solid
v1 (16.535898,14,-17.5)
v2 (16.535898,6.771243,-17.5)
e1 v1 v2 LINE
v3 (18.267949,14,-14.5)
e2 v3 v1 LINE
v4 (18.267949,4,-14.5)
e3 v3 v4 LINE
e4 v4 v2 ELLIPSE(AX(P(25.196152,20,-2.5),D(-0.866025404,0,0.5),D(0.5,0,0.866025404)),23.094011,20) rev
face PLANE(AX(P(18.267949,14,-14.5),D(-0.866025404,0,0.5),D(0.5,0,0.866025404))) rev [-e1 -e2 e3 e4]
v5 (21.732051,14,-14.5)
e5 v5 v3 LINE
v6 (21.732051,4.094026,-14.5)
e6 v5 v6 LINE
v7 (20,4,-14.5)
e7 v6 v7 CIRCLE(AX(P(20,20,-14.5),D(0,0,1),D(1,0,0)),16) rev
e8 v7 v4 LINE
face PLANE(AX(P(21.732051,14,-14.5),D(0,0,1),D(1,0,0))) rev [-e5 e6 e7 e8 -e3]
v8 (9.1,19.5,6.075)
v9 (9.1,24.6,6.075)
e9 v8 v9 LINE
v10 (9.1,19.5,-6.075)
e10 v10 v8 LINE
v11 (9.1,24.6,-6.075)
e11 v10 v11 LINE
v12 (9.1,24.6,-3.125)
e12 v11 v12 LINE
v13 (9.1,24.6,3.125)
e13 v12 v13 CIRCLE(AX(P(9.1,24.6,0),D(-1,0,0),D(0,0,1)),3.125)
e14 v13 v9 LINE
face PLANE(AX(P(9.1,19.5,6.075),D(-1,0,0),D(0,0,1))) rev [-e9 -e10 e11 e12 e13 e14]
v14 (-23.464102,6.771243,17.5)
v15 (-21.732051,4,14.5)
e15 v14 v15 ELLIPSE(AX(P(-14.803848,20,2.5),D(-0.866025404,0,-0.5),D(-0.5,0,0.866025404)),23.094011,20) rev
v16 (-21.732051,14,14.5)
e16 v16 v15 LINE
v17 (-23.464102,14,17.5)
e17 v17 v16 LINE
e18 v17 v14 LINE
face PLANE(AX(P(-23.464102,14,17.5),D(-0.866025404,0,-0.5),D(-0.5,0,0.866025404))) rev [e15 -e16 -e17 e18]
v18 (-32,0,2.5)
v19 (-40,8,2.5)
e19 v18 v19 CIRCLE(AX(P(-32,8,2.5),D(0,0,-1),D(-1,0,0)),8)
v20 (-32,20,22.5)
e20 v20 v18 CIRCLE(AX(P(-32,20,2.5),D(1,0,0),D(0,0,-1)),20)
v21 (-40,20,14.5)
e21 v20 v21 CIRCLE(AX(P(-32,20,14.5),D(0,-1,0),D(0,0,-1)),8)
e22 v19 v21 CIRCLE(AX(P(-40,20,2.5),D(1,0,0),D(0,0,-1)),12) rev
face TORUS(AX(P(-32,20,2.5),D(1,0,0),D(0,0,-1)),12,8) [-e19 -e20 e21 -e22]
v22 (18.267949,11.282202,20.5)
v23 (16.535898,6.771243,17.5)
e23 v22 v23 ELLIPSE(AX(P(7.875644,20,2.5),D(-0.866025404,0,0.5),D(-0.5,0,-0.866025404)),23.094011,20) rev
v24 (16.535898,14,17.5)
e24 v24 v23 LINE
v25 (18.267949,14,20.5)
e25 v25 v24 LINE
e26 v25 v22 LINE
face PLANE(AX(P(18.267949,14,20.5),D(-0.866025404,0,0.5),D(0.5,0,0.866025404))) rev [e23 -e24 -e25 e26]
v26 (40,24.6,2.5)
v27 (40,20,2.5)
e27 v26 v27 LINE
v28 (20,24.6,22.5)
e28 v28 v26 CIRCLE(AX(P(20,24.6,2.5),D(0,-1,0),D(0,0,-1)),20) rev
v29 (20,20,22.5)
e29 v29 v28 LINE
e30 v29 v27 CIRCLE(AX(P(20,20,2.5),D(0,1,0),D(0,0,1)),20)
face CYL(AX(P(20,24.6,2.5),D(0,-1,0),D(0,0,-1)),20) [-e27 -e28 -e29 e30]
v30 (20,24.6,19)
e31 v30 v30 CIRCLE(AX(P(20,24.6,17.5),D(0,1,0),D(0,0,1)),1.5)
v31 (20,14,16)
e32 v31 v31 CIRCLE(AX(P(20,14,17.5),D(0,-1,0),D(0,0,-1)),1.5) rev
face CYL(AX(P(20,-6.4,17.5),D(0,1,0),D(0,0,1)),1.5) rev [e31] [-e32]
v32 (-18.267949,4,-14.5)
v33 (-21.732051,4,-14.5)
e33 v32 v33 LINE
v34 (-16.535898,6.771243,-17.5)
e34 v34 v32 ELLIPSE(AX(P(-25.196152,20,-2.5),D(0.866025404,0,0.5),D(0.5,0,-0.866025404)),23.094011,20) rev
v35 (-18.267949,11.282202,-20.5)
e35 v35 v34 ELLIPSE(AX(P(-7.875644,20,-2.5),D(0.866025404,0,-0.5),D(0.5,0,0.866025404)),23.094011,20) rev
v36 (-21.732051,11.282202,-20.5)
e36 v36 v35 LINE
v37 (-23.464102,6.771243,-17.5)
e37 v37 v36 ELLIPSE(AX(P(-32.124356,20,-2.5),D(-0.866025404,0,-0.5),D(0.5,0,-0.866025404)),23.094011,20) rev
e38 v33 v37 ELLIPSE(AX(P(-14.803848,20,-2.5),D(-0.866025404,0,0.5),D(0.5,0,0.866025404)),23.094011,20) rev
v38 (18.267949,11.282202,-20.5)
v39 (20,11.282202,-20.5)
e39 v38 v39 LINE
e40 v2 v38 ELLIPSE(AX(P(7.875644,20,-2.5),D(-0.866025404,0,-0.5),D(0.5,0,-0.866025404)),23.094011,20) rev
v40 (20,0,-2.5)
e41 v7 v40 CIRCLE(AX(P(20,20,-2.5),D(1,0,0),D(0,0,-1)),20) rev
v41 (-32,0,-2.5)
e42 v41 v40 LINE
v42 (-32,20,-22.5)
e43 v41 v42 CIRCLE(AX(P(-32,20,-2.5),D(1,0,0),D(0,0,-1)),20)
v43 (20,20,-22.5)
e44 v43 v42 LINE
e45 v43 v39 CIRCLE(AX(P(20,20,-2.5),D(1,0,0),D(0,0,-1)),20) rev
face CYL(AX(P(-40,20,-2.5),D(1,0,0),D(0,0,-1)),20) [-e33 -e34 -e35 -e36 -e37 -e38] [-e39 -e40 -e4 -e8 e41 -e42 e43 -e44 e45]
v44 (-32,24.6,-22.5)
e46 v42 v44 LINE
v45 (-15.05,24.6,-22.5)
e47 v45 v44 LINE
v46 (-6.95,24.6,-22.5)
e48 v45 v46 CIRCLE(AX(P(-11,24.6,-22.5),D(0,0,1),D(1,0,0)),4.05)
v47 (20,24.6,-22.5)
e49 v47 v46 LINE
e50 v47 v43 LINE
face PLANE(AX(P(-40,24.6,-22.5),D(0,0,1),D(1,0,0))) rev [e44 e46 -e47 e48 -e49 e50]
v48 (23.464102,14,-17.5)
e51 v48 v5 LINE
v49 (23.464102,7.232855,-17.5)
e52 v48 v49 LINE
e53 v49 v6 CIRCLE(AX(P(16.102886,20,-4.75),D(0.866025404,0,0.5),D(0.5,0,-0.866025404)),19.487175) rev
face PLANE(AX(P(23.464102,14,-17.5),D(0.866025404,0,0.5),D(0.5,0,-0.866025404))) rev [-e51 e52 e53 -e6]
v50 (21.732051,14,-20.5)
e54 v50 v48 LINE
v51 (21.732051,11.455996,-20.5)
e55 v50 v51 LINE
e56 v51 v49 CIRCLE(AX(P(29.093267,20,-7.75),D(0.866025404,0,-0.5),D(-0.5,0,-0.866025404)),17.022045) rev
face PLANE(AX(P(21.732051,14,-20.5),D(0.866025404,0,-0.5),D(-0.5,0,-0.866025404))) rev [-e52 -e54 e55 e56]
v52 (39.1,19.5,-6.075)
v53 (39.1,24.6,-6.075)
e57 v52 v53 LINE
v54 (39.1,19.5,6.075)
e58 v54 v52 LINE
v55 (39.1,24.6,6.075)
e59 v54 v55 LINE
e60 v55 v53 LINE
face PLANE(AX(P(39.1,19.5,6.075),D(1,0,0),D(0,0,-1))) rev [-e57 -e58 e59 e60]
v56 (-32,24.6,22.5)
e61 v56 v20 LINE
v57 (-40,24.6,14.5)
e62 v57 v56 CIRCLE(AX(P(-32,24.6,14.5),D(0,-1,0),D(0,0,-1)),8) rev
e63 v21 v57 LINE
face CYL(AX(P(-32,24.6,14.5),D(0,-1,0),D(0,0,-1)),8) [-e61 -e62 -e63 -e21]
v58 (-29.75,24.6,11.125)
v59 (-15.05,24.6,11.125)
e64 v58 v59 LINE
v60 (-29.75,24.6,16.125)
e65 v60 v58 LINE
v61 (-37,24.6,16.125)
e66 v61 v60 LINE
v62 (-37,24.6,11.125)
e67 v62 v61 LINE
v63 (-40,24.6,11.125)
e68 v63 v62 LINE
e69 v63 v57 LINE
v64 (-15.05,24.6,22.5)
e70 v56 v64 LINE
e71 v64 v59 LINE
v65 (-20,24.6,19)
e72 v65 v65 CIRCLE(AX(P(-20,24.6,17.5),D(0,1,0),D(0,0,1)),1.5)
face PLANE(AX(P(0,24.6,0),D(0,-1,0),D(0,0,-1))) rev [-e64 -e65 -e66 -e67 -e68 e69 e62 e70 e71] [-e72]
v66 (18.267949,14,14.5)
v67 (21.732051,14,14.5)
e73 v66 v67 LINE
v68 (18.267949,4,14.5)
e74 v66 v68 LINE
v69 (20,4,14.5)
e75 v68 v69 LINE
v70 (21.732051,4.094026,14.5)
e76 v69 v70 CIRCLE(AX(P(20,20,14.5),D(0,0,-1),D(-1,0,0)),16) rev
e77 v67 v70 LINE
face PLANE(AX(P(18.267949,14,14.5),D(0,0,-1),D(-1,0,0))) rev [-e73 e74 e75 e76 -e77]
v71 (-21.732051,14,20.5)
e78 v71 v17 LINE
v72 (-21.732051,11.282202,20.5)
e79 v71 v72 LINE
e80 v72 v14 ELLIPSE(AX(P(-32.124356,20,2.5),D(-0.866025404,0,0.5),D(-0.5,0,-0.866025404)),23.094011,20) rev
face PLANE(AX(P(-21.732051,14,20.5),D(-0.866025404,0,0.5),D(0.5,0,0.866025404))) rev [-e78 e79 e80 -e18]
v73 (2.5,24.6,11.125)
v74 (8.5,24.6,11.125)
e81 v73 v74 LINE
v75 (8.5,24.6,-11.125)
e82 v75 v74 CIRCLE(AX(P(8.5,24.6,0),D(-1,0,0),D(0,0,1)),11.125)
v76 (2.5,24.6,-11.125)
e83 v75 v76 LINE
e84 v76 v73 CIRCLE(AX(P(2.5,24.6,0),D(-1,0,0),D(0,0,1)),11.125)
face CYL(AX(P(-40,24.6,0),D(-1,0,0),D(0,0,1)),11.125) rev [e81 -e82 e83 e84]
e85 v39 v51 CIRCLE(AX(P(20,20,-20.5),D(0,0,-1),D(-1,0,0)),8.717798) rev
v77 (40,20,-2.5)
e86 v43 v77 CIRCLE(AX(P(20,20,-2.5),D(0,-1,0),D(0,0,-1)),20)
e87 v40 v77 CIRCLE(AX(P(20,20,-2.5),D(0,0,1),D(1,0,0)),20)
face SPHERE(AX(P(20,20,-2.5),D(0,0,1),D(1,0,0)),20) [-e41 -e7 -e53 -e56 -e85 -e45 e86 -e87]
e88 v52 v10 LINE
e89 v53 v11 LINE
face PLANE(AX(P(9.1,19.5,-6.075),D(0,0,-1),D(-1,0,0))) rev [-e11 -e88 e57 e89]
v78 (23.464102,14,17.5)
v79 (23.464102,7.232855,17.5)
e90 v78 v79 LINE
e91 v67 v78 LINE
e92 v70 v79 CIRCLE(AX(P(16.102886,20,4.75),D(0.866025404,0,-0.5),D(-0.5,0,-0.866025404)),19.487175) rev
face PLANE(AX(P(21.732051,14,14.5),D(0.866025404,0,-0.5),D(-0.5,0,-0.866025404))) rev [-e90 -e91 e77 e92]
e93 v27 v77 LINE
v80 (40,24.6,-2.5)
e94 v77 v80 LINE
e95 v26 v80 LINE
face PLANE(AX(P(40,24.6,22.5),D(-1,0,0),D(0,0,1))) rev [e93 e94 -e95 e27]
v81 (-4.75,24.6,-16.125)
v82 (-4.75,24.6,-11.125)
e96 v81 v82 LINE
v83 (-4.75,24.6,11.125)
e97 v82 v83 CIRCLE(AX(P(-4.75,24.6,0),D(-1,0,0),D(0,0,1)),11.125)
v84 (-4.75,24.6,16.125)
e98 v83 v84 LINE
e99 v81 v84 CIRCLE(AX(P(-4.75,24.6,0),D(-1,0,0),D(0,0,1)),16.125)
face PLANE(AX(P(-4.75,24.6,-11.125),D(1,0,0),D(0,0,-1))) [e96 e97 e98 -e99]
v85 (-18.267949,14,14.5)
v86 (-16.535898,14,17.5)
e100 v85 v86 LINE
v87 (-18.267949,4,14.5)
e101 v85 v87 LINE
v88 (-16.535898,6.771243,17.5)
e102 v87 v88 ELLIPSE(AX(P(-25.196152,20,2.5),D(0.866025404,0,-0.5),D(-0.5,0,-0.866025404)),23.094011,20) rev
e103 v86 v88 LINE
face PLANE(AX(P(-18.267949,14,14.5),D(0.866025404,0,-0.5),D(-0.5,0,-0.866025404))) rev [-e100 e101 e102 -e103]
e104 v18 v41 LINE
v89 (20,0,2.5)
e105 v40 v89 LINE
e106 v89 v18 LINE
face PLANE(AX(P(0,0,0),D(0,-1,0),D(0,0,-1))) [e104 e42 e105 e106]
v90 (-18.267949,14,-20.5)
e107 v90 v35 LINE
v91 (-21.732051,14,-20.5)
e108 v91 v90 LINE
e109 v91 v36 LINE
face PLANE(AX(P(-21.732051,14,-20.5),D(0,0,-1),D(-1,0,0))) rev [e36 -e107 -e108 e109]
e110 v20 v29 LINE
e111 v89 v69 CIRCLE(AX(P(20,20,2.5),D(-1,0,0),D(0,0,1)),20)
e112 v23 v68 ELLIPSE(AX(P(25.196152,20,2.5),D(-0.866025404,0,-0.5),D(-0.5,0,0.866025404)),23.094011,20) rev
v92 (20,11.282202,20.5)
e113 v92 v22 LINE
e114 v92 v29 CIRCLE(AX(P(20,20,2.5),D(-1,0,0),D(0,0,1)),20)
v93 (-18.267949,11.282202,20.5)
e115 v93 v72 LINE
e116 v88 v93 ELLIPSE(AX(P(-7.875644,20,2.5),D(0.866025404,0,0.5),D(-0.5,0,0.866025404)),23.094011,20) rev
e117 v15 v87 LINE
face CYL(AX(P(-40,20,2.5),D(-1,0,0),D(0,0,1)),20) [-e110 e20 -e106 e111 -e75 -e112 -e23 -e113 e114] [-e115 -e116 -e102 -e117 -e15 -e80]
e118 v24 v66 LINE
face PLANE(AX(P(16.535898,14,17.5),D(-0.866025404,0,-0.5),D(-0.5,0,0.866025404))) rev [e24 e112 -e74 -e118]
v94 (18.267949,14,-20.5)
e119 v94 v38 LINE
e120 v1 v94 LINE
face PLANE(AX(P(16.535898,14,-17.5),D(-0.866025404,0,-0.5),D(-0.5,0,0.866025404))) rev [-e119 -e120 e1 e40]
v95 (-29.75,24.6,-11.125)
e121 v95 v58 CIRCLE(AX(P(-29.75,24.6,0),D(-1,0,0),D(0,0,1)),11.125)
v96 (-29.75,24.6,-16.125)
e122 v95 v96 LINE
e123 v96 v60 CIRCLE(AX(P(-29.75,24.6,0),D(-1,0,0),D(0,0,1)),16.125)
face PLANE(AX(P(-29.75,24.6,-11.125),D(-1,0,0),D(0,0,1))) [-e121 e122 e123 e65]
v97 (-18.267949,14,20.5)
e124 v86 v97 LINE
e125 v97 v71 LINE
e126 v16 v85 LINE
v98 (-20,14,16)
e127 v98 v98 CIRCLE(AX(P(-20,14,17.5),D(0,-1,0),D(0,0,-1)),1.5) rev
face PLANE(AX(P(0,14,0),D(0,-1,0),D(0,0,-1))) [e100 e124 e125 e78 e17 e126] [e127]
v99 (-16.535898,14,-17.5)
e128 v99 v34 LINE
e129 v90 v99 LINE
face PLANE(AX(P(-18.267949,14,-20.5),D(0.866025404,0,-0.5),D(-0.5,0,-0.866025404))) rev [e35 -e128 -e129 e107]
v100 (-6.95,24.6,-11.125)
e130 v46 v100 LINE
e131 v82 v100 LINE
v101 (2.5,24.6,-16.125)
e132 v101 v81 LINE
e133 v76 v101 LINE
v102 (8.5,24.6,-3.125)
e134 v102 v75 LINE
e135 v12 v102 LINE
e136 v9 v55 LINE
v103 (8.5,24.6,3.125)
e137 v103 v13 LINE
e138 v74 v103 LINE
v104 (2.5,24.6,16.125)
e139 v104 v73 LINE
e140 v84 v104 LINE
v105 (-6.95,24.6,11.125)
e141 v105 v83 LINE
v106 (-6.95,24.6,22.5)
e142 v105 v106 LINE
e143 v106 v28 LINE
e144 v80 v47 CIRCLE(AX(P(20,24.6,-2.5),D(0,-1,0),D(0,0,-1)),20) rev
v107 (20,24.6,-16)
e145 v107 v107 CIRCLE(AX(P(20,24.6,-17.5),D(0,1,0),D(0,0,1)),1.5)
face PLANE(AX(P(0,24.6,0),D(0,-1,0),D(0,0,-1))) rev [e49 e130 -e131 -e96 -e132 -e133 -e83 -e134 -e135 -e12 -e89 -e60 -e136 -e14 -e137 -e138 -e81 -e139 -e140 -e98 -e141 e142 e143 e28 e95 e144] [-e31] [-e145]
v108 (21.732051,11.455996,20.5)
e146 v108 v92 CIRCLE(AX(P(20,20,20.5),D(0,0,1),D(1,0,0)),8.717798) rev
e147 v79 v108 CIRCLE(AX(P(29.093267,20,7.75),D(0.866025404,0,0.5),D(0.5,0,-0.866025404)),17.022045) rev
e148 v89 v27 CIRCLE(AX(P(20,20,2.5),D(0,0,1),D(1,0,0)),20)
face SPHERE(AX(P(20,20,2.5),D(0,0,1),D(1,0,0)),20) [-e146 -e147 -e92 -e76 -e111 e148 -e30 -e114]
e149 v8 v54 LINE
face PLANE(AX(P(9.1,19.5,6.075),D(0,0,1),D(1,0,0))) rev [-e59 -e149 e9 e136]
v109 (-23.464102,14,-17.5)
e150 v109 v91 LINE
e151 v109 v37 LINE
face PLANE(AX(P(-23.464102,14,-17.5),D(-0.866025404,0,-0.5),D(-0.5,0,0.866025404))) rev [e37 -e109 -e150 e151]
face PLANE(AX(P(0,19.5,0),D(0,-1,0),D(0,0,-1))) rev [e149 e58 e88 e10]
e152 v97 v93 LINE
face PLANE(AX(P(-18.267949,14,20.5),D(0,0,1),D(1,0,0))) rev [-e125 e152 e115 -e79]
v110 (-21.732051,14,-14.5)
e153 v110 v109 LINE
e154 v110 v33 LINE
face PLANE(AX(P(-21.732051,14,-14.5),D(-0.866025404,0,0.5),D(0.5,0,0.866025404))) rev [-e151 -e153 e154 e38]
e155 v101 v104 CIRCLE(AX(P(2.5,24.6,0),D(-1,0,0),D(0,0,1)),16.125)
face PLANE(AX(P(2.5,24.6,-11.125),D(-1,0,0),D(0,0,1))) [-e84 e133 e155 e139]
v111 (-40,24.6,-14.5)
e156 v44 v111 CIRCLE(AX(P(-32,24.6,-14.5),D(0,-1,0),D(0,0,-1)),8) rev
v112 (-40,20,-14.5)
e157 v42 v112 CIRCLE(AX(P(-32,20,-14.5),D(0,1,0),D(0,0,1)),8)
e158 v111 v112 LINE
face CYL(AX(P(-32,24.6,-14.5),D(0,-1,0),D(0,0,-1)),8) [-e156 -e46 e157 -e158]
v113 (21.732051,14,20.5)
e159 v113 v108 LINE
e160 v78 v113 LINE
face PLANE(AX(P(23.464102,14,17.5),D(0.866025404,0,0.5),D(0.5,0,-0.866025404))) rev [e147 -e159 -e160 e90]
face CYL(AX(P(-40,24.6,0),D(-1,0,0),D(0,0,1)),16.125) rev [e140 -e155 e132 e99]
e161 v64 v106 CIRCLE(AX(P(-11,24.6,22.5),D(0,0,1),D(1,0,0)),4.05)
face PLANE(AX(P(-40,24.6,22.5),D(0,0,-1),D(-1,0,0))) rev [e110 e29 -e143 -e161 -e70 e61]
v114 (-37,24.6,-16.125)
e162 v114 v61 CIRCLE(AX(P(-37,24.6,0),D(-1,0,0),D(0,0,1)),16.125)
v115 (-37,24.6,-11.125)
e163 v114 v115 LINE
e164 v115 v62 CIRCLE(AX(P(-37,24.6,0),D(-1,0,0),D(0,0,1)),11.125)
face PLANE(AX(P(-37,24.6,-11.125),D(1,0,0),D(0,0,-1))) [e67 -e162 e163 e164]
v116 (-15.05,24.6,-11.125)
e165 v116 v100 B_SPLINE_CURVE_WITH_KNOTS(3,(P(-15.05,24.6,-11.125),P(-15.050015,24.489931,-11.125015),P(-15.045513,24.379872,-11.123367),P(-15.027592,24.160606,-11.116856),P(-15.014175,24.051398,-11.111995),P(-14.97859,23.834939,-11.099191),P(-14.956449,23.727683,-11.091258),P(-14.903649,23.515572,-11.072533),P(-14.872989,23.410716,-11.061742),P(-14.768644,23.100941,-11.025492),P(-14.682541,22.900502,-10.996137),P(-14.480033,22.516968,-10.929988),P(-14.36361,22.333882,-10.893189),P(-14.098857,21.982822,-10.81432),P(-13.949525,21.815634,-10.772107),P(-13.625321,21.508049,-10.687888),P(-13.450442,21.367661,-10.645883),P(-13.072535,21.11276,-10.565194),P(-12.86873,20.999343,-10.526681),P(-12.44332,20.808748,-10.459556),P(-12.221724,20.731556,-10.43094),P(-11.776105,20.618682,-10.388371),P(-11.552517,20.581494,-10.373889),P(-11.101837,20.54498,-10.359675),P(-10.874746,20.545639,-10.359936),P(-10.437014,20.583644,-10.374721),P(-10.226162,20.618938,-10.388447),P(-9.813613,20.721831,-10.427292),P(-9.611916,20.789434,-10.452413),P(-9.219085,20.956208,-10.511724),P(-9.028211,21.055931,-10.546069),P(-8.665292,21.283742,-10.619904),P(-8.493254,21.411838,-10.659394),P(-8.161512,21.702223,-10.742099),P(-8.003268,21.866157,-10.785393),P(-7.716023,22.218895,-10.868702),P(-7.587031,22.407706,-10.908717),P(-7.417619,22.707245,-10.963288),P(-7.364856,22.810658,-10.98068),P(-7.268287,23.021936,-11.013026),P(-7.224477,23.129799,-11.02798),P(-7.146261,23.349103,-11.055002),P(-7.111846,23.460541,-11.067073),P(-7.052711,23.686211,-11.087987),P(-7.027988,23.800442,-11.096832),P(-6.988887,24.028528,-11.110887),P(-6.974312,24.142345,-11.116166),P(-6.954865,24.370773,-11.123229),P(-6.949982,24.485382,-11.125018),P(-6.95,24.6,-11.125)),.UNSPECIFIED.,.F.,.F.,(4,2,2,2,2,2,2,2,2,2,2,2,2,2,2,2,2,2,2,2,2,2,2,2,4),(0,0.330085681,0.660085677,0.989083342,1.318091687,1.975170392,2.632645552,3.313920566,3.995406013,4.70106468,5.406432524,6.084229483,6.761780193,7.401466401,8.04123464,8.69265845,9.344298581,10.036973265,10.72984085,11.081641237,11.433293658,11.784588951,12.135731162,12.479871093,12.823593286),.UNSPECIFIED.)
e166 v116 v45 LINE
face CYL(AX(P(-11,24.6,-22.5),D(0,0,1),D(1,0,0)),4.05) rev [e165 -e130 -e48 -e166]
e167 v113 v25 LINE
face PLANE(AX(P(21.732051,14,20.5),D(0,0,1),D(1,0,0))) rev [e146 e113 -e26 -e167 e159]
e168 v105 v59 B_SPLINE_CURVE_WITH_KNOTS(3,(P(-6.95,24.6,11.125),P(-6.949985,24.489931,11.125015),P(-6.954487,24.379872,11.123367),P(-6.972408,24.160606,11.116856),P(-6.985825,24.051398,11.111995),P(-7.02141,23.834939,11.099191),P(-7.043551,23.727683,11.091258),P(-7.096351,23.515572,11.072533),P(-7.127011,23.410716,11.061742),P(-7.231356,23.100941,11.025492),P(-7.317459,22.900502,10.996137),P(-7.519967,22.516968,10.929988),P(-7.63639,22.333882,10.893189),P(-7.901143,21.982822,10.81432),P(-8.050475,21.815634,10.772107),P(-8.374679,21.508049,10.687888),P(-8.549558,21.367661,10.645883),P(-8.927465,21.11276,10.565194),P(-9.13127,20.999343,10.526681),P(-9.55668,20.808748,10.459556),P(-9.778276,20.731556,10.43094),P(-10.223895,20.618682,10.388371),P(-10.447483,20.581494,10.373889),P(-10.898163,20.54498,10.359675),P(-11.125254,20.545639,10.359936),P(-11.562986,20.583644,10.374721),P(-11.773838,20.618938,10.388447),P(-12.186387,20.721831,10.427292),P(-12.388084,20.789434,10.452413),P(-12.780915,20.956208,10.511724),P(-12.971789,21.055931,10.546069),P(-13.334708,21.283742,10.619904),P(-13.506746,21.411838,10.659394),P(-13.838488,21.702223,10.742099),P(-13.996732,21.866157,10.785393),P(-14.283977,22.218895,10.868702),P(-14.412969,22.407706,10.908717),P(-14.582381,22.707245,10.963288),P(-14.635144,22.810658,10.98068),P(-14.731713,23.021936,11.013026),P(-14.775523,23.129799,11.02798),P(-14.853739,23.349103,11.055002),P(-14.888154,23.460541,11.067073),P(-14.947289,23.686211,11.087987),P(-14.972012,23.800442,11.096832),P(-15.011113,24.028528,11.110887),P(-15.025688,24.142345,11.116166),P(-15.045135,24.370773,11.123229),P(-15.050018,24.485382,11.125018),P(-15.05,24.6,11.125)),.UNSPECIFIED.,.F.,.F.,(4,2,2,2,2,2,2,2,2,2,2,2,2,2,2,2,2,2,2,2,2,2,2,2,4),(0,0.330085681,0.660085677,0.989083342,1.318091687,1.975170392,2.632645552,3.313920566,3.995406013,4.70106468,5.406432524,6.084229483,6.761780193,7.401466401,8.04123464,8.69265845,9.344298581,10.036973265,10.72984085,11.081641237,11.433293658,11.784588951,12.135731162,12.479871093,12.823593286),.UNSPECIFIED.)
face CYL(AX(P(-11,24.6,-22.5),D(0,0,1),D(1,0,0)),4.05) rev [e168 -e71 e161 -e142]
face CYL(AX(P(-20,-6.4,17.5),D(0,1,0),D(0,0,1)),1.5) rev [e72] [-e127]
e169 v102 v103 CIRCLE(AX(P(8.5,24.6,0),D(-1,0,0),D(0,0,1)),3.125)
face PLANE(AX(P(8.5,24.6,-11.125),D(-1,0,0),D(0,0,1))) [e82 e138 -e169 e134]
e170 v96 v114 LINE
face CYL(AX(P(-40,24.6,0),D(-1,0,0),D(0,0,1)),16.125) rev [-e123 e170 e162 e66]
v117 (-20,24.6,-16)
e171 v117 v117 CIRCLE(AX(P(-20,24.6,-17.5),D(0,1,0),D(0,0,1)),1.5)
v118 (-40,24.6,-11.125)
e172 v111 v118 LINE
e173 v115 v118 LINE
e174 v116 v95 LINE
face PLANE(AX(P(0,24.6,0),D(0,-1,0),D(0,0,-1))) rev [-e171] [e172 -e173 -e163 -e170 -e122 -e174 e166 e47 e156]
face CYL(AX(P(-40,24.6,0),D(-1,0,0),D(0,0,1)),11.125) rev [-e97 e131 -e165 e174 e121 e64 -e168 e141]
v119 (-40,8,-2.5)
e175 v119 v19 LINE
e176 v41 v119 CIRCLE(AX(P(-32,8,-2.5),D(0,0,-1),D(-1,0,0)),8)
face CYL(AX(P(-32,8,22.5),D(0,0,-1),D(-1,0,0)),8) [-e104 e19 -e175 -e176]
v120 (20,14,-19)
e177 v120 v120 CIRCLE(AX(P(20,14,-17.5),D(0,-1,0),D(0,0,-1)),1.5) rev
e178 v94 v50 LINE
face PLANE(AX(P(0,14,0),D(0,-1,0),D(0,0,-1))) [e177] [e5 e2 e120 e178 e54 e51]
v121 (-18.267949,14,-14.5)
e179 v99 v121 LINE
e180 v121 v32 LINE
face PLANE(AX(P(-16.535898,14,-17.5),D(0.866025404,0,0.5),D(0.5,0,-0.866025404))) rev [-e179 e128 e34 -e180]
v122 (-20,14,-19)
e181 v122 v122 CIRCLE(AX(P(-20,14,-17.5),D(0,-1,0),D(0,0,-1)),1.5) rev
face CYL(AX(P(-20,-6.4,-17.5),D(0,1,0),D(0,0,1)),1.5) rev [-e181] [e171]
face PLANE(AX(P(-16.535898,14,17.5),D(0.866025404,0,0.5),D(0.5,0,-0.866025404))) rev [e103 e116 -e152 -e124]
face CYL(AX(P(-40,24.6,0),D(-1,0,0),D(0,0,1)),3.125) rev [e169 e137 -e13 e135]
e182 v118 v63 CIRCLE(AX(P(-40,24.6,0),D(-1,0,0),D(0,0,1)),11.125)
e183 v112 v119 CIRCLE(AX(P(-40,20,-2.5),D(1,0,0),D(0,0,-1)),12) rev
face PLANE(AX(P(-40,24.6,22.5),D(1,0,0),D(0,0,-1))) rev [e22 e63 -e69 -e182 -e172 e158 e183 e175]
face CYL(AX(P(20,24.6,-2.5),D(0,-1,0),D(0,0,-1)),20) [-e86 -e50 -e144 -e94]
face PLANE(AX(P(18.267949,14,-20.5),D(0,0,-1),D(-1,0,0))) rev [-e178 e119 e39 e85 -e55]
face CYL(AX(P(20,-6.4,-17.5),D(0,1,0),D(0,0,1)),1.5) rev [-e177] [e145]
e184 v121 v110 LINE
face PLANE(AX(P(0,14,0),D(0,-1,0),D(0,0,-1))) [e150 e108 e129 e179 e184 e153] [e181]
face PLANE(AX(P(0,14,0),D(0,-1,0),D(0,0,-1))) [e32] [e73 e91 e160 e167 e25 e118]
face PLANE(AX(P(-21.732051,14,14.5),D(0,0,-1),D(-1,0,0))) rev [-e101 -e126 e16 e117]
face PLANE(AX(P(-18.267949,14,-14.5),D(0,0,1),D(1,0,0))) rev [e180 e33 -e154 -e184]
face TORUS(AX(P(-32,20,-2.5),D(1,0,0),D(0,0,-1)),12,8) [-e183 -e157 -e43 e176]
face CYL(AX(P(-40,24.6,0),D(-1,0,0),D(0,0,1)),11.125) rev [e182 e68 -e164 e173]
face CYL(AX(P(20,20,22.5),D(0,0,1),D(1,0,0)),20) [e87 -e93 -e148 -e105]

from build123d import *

# Parameters (mm, degrees)
SKETCH1_W           = 80
SKETCH1_H           = 45
BOSS_EXTRUDE1_DEPTH = 24.6
SKETCH3_W           = 30
SKETCH3_H           = 12.15
CUT_EXTRUDE1_DEPTH  = 5.1
SKETCH4_R           = 4.05
CUT_EXTRUDE2_DEPTH  = 66.039680196
SKETCH5_R           = 1.5
CUT_EXTRUDE3_DEPTH  = 31
FILLET1_START       = -40
FILLET1_DEPTH       = 80
FILLET2_R           = 20
CUT_EXTRUDE4_DEPTH  = 14
FILLET3_R           = 8


with BuildPart() as part:
    # Sketch1 → Boss-Extrude1 (new body)
    with BuildSketch(Plane(origin=(0, 0, 0), x_dir=(1, 0, 0), z_dir=(0, 1, 0))):
        Rectangle(SKETCH1_W, SKETCH1_H)
    extrude(amount=BOSS_EXTRUDE1_DEPTH)

    # Sketch2 → Cut-Revolve1 (revolve, cut)
    with BuildSketch(Plane(origin=(0, 24.6, 0), x_dir=(1, 0, 0), z_dir=(0, 1, 0))):
        Polygon((8.5, 3.125), (9.5, 3.125), (9.5, 0), (6, 0), (-40, 0), (-40, 11.125), (-37, 11.125), (-37, 16.125), (-29.75, 16.125), (-29.75, 11.125), (-4.75, 11.125), (-4.75, 16.125), (2.5, 16.125), (2.5, 11.125), (8.5, 11.125), align=None)
    revolve(axis=Axis((-40, 24.6, 0), (1, 0, 0)), mode=Mode.SUBTRACT)

    # Sketch3 → Cut-Extrude1 (cut)
    with BuildSketch(Plane(origin=(0, 24.6, 0), x_dir=(1, 0, 0), z_dir=(0, 1, 0))):
        with Locations((24.1, 0)):
            Rectangle(SKETCH3_W, SKETCH3_H)
    extrude(amount=-CUT_EXTRUDE1_DEPTH, mode=Mode.SUBTRACT)

    # Sketch4 → Cut-Extrude2 (cut, through all)
    with BuildSketch(Plane.XY.offset(22.5)):
        with Locations((-11, 24.6)):
            Circle(SKETCH4_R)
    extrude(amount=-CUT_EXTRUDE2_DEPTH, mode=Mode.SUBTRACT)

    # Sketch5 → Cut-Extrude3 (cut)
    with BuildSketch(Plane(origin=(0, 24.6, 0), x_dir=(1, 0, 0), z_dir=(0, 1, 0))):
        with Locations(Location((-20, 17.5, 0), (0, 0, 270))):
            Circle(SKETCH5_R)
        with Locations(Location((-20, -17.5, 0), (0, 0, 270))):
            Circle(SKETCH5_R)
        with Locations(Location((20, -17.5, 0), (0, 0, 270))):
            Circle(SKETCH5_R)
        with Locations(Location((20, 17.5, 0), (0, 0, 270))):
            Circle(SKETCH5_R)
    extrude(amount=-CUT_EXTRUDE3_DEPTH, mode=Mode.SUBTRACT)

    # Fillet1: read off the stored shape, not the designer's step
    # Fillet1 outline → Fillet1 (cut)
    with BuildSketch(Plane.YZ.offset(FILLET1_START)):
        with BuildLine():
            Line((0, 22.5), (0, 2.5))
            ThreePointArc((0, 2.5), (5.857864376, 16.642135624), (20, 22.5))
            Line((20, 22.5), (0, 22.5))
        make_face()
        with BuildLine():
            ThreePointArc((20, -22.5), (5.857864376, -16.642135624), (0, -2.5))
            Line((0, -2.5), (0, -22.5))
            Line((0, -22.5), (20, -22.5))
        make_face()
    extrude(amount=FILLET1_DEPTH, mode=Mode.SUBTRACT)

    # Fillet2
    # the kernel refuses this fillet: 20 mm, written as the material it takes off along each edge
    with BuildSketch(Plane(origin=(40, 0, 2.5), x_dir=(0, 1, 0), z_dir=(0, 0, -1))) as fillet2_piece_1:
        with BuildLine():
            CenterArc((FILLET2_R, -FILLET2_R), FILLET2_R, 90, 90)
            Line((0, -FILLET2_R), (0, 0))
            Line((0, 0), (FILLET2_R, 0))
        make_face()
    extrude(amount=5, mode=Mode.SUBTRACT)
    with BuildSketch(Plane(origin=(40, 19.999999999, 2.500000001), x_dir=(0, -1.0, -4.592977109962882e-11), z_dir=(0, 4.592977109962882e-11, -1.0))) as fillet2_piece_2:
        with BuildLine():
            CenterArc((19.999999999 - FILLET2_R, FILLET2_R), FILLET2_R, 270, 90)
            Line((19.999999999 - FILLET2_R, 0), (19.999999999, 0))
            Line((19.999999999, 0), (19.999999999, FILLET2_R))
        make_face()
    revolve(axis=Axis((40, 19.999999999, 2.500000001), (-1, 0, 0)), revolution_arc=90.000000005, mode=Mode.SUBTRACT)
    with BuildSketch(Plane(origin=(40, 19.999999999, -2.500000001), x_dir=(0, 4.592966007732635e-11, -1.0), z_dir=(0, 1.0, 4.592966007732635e-11))) as fillet2_piece_3:
        with BuildLine():
            CenterArc((19.999999999 - FILLET2_R, FILLET2_R), FILLET2_R, 270, 90)
            Line((19.999999999, FILLET2_R), (19.999999999, 0))
            Line((19.999999999, 0), (19.999999999 - FILLET2_R, 0))
        make_face()
    revolve(axis=Axis((40, 19.999999999, -2.500000001), (-1, 0, 0)), revolution_arc=90.000000005, mode=Mode.SUBTRACT)
    with BuildSketch(Plane(origin=(40, 20, 22.5), x_dir=(-1, 0, 0), z_dir=(0, 1, 0)), Plane(origin=(40, 20, -22.5), x_dir=(0, 0, 1), z_dir=(0, 1, 0))) as fillet2_piece_4:
        with BuildLine():
            CenterArc((FILLET2_R, -FILLET2_R), FILLET2_R, 90, 90)
            Line((0, -FILLET2_R), (0, 0))
            Line((0, 0), (FILLET2_R, 0))
        make_face()
    extrude(amount=54.6, mode=Mode.SUBTRACT)

    # Sketch6 → Cut-Extrude4 (cut)
    with BuildSketch(Plane.XZ):
        Polygon((21.732050808, 20.5), (18.267949192, 20.5), (16.535898385, 17.5), (18.267949192, 14.5), (21.732050808, 14.5), (23.464101615, 17.5), align=None)
        Polygon((-18.267949192, 20.5), (-21.732050808, 20.5), (-23.464101615, 17.5), (-21.732050808, 14.5), (-18.267949192, 14.5), (-16.535898385, 17.5), align=None)
        Polygon((-18.267949192, -14.5), (-21.732050808, -14.5), (-23.464101615, -17.5), (-21.732050808, -20.5), (-18.267949192, -20.5), (-16.535898385, -17.5), align=None)
        Polygon((21.732050808, -14.5), (18.267949192, -14.5), (16.535898385, -17.5), (18.267949192, -20.5), (21.732050808, -20.5), (23.464101615, -17.5), align=None)
    extrude(amount=-CUT_EXTRUDE4_DEPTH, mode=Mode.SUBTRACT)

    # Fillet3
    fillet3_edges = [part.edges().sort_by_distance(p)[0] for p in [
        (-40, 0, 0),
        (-40, 5.857864376, 16.642135624),
        (-40, 5.857864376, -16.642135624),
        (-40, 22.3, 22.5),
        (-40, 22.3, -22.5),
    ]]
    fillet(fillet3_edges, radius=FILLET3_R)


solid = part.part
